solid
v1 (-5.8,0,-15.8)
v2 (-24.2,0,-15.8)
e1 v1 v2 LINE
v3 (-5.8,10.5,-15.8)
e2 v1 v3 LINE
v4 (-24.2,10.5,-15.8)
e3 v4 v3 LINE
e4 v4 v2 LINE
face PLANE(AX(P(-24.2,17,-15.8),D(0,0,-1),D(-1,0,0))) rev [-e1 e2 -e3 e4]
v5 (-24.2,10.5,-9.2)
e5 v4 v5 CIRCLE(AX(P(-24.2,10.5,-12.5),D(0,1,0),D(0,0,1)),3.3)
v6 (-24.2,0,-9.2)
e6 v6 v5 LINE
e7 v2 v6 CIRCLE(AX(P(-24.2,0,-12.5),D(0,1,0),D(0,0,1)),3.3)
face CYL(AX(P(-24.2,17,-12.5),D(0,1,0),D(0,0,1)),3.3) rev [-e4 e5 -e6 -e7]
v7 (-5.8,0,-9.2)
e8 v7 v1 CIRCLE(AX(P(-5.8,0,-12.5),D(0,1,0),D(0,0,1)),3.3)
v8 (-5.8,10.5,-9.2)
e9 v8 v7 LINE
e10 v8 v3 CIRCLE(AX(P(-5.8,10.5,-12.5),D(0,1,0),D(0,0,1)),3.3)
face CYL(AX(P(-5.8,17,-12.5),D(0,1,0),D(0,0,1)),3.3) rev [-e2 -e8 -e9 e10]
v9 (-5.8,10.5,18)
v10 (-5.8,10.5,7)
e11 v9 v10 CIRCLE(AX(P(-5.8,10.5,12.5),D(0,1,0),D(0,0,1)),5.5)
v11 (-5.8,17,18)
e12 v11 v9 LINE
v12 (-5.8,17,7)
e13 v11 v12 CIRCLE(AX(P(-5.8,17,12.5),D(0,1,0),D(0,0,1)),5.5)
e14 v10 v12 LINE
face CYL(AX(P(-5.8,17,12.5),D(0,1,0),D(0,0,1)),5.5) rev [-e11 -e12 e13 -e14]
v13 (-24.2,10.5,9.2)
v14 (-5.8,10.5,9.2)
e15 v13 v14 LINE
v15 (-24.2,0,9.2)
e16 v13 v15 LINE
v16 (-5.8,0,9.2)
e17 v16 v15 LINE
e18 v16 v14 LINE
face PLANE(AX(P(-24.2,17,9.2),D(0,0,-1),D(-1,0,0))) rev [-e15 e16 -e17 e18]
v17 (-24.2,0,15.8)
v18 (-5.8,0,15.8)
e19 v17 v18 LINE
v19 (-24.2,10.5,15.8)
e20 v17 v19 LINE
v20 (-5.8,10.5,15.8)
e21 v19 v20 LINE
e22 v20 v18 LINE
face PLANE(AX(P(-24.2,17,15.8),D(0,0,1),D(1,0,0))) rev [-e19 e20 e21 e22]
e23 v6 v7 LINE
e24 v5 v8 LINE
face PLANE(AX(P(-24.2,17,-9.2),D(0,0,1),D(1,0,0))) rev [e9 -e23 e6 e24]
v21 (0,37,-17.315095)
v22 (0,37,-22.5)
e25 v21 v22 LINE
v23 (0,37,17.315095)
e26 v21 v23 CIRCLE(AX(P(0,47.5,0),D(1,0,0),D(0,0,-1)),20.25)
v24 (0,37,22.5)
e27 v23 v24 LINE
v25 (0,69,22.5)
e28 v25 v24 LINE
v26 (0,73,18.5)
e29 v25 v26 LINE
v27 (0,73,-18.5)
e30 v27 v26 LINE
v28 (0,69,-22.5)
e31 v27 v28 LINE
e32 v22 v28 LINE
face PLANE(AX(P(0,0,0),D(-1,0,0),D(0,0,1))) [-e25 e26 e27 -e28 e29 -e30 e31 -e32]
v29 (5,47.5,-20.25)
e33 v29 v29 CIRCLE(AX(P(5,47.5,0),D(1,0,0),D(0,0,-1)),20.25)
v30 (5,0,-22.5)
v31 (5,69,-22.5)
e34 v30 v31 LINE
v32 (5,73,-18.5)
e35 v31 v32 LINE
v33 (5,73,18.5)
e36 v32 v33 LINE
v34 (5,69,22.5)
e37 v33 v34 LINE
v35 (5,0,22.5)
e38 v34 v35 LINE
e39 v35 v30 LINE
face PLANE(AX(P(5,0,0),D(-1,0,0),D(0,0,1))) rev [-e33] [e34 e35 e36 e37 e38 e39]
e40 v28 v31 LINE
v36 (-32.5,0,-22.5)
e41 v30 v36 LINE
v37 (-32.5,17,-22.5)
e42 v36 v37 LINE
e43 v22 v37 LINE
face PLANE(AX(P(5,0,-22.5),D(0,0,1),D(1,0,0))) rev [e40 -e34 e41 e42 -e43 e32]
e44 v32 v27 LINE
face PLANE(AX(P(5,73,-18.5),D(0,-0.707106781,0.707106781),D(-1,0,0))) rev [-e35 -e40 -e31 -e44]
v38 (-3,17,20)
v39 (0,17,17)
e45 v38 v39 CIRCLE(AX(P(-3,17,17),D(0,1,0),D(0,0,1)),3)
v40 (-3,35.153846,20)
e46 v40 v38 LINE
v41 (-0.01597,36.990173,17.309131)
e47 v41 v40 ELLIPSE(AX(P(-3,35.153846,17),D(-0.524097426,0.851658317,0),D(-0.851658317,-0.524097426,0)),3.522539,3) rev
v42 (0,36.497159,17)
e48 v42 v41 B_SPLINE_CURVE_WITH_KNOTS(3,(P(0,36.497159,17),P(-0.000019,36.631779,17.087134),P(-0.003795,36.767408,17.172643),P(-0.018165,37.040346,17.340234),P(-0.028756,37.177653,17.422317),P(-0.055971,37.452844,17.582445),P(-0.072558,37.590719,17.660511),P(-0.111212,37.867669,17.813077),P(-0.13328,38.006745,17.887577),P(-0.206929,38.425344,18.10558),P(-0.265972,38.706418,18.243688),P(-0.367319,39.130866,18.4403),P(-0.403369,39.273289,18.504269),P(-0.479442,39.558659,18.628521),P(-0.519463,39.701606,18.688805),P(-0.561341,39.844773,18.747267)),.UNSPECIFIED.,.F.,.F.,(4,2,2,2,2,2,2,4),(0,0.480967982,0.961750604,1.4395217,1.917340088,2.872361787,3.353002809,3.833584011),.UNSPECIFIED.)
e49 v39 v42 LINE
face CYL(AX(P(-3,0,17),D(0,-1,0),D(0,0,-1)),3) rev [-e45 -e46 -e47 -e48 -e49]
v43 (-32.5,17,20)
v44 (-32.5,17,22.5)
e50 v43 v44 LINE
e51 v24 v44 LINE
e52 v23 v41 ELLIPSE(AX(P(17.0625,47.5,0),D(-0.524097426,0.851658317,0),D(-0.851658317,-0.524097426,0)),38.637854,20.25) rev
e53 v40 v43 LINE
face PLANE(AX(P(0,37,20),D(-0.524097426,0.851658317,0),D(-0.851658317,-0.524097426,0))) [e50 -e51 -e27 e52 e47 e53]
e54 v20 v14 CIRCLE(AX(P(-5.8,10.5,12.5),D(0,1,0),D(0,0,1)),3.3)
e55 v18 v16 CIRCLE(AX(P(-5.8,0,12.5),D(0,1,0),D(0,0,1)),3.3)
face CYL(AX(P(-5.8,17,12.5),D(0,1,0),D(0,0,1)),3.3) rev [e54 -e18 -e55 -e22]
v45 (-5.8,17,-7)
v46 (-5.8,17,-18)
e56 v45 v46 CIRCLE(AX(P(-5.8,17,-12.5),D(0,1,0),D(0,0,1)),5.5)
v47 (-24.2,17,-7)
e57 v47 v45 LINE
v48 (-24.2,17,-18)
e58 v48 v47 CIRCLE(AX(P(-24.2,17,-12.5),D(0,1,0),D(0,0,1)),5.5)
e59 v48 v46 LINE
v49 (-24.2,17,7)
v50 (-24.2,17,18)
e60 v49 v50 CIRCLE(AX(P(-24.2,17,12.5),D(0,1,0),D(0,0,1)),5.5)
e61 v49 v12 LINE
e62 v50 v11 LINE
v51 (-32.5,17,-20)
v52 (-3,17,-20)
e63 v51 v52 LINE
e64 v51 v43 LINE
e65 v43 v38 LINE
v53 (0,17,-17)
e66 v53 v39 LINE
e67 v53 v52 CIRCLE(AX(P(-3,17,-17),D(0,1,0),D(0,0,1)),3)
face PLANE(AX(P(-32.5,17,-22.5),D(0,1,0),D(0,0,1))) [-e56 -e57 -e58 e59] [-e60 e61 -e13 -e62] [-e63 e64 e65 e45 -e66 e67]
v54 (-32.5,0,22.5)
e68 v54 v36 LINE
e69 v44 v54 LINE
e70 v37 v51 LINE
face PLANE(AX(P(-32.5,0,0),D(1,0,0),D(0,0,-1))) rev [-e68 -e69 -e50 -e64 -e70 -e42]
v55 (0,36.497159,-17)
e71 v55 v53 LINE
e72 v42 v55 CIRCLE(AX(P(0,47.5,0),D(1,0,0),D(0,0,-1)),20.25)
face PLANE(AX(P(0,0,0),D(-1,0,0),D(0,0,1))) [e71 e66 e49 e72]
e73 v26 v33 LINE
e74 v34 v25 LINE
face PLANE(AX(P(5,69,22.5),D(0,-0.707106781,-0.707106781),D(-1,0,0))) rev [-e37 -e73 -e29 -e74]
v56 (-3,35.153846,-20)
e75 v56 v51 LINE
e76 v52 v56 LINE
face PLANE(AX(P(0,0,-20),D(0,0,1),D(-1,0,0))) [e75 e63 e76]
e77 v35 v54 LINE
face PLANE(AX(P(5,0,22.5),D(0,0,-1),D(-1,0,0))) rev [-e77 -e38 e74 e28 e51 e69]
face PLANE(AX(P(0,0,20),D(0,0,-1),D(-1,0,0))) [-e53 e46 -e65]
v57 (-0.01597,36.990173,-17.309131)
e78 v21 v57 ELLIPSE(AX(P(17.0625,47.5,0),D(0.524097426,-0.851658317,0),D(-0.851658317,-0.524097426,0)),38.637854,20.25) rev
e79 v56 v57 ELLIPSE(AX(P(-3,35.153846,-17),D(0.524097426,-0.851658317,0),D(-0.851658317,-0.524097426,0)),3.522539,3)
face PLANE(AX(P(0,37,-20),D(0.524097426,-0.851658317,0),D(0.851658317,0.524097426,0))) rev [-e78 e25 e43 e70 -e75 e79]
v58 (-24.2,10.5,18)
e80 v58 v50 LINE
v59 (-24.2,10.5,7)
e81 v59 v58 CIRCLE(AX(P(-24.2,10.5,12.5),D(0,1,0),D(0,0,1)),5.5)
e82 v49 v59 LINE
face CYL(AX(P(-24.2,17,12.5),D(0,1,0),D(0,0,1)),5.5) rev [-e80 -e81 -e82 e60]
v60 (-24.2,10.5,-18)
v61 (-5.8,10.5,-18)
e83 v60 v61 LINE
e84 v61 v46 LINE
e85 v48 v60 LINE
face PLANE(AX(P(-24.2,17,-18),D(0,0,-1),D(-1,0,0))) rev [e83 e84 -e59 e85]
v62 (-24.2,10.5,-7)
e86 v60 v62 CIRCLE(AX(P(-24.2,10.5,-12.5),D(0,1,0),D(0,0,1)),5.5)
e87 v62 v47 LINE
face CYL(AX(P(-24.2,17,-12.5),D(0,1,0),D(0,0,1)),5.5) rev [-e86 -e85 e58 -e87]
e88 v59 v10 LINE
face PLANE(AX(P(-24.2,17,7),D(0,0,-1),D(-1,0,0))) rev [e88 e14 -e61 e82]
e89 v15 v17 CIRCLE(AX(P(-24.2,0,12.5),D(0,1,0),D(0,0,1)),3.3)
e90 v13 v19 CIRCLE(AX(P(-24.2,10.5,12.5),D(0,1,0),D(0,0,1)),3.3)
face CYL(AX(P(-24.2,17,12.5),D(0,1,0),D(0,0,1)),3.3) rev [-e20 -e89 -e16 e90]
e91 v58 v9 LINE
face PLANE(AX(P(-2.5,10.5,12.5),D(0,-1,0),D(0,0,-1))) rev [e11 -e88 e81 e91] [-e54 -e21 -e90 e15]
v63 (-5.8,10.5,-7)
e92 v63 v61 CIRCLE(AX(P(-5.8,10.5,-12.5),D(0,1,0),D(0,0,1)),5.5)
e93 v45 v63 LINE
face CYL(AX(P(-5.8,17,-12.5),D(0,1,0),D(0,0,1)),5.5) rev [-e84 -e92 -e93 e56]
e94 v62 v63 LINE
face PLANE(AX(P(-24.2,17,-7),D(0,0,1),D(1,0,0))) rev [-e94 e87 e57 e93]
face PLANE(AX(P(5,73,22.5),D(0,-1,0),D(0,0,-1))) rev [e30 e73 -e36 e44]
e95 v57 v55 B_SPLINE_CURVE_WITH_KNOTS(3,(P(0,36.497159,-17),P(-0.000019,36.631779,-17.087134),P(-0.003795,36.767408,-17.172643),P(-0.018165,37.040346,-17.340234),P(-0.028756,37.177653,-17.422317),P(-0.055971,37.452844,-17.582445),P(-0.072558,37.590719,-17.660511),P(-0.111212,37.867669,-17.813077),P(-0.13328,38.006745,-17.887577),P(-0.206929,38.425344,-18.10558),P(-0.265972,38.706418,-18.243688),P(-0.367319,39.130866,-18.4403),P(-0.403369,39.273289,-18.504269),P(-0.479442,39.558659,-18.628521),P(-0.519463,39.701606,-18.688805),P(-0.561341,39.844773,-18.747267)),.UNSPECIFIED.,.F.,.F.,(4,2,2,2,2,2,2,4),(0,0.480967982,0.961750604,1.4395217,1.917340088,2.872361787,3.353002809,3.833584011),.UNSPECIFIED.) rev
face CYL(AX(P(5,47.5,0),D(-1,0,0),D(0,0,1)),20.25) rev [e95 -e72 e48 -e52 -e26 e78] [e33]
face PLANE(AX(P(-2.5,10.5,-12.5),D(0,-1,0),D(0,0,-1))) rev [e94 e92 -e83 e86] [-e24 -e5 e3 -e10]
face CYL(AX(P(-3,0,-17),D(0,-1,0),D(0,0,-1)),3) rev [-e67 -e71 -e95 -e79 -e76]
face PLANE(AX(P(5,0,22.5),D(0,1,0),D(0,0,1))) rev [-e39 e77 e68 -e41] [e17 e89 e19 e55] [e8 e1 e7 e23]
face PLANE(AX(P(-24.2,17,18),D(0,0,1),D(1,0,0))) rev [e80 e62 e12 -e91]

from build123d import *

# Parameters (mm, degrees)
SKETCH1_W                                      = 45
SKETCH1_H                                      = 73
SKETCH1_R                                      = 20.25
BOSS_EXTRUDE1_DEPTH                            = 5
CHAMFER1_SIZE                                  = 4
SKETCH2_W                                      = 45
SKETCH2_H                                      = 17
BOSS_EXTRUDE2_DEPTH                            = 32.5
CBORE_SLOT_FOR_M6_HEX_SOCKET_HEAD_CAP_SC_DEPTH = 17
CBORE_START                                    = 10.5
CBORE_SLOT_FOR_M6_HEX_SOCKET_HEAD_CA_3_DEPTH   = 6.5
BOSS_EXTRUDE3_DEPTH                            = 2.5
FILLET1_R                                      = 3
FILLET1_OF_MIRROR1_R                           = 3


# Read off the part's stored shape, not the designer's step: CBORE SLOT for M6 Hex Socket Head Cap Screw1
with BuildPart() as part:
    # Sketch1 → Boss-Extrude1 (new body)
    with BuildSketch(Plane(origin=(0, 0, 0), x_dir=(0, 0, -1), z_dir=(1, 0, 0))):
        with Locations((0, 36.5)):
            Rectangle(SKETCH1_W, SKETCH1_H)
        with Locations((0, 47.5)):
            Circle(SKETCH1_R, mode=Mode.SUBTRACT)
    extrude(amount=BOSS_EXTRUDE1_DEPTH)

    # Chamfer1
    chamfer1_edges = [part.edges().sort_by_distance(p)[0] for p in [
        (2.5, 73, 22.5),
        (2.5, 73, -22.5),
    ]]
    chamfer(chamfer1_edges, length=CHAMFER1_SIZE)

    # Sketch2 → Boss-Extrude2 (add)
    with BuildSketch(Plane.ZY):
        with Locations((0, 8.5)):
            Rectangle(SKETCH2_W, SKETCH2_H)
    extrude(amount=BOSS_EXTRUDE2_DEPTH)

    # CBORE SLOT for M6 Hex Socket Head Ca 2 → CBORE SLOT for M6 Hex Socket Head Cap Screw1 (cut)
    with BuildSketch(Plane(origin=(0, 0, 0), x_dir=(1, 0, 0), z_dir=(0, 1, 0))):
        with BuildLine():
            Line((-24.2, -15.8), (-5.8, -15.8))
            ThreePointArc((-5.8, -15.8), (-2.5, -12.5), (-5.8, -9.2))
            Line((-5.8, -9.2), (-24.2, -9.2))
            ThreePointArc((-24.2, -9.2), (-27.5, -12.5), (-24.2, -15.8))
        make_face()
        with BuildLine():
            Line((-24.2, 9.2), (-5.8, 9.2))
            ThreePointArc((-5.8, 9.2), (-2.5, 12.5), (-5.8, 15.8))
            Line((-5.8, 15.8), (-24.2, 15.8))
            ThreePointArc((-24.2, 15.8), (-27.5, 12.5), (-24.2, 9.2))
        make_face()
    extrude(amount=CBORE_SLOT_FOR_M6_HEX_SOCKET_HEAD_CAP_SC_DEPTH, mode=Mode.SUBTRACT)

    # CBORE SLOT for M6 Hex Socket Head Ca 3 o → CBORE SLOT for M6 Hex Socket Head Ca 3 (cut)
    # profile 1 of 2: a face of its own
    with BuildSketch(Plane(origin=(0, 0, 0), x_dir=(1, 0, 0), z_dir=(0, 1, 0)).offset(CBORE_START)):
        with BuildLine():
            Line((-24.2, -18), (-5.8, -18))
            ThreePointArc((-5.8, -18), (-0.3, -12.5), (-5.8, -7))
            Line((-5.8, -7), (-24.2, -7))
            ThreePointArc((-24.2, -7), (-29.7, -12.5), (-24.2, -18))
        make_face()
        with BuildLine():
            ThreePointArc((-5.8, -9.2), (-2.5, -12.5), (-5.8, -15.8))
            Line((-5.8, -15.8), (-24.2, -15.8))
            ThreePointArc((-24.2, -15.8), (-27.5, -12.5), (-24.2, -9.2))
            Line((-24.2, -9.2), (-5.8, -9.2))
        make_face(mode=Mode.SUBTRACT)
    # profile 2 of 2: a face of its own
    with BuildSketch(Plane(origin=(0, 0, 0), x_dir=(1, 0, 0), z_dir=(0, 1, 0)).offset(CBORE_START)):
        with BuildLine():
            Line((-24.2, 7), (-5.8, 7))
            ThreePointArc((-5.8, 7), (-0.3, 12.5), (-5.8, 18))
            Line((-5.8, 18), (-24.2, 18))
            ThreePointArc((-24.2, 18), (-29.7, 12.5), (-24.2, 7))
        make_face()
        with BuildLine():
            ThreePointArc((-5.8, 15.8), (-2.5, 12.5), (-5.8, 9.2))
            Line((-5.8, 9.2), (-24.2, 9.2))
            ThreePointArc((-24.2, 9.2), (-27.5, 12.5), (-24.2, 15.8))
            Line((-24.2, 15.8), (-5.8, 15.8))
        make_face(mode=Mode.SUBTRACT)
    extrude(amount=CBORE_SLOT_FOR_M6_HEX_SOCKET_HEAD_CA_3_DEPTH, mode=Mode.SUBTRACT)

    # Sketch5 → Boss-Extrude3 (add)
    with BuildSketch(Plane.XY.offset(22.5)):
        Polygon((0, 37), (-32.5, 17), (0, 17), align=None)
    boss_extrude3 = extrude(amount=-BOSS_EXTRUDE3_DEPTH)

    # Fillet1
    # the kernel refuses this fillet: 3 mm, written as the material it adds along each edge
    with BuildSketch(Plane(origin=(0, 9.5, 20), x_dir=(0, 0, -1), z_dir=(0, 1, 0))) as fillet1_piece_1_section:
        with BuildLine():
            CenterArc((FILLET1_R, FILLET1_R), FILLET1_R, 180, 90)
            Line((0, FILLET1_R), (0, 0))
            Line((0, 0), (FILLET1_R, 0))
        make_face()
    fillet1_piece_1 = extrude(amount=35, mode=Mode.PRIVATE)
    fillet1_piece_1 = split(fillet1_piece_1, bisect_by=Plane(origin=(-11.093486365, 30.17323916, 19.320814657), z_dir=(0.5240974256643348, -0.8516583167045438, 0)), keep=Keep.TOP, mode=Mode.PRIVATE)
    fillet1_piece_1 = fillet1_piece_1 - Plane(origin=(-0.679185343, 47.5, 0), x_dir=(0, 0, -1), z_dir=(-1, 0, 0)) * Cylinder(20.25, 83, mode=Mode.PRIVATE)
    add(fillet1_piece_1)

    # Mirror1: Boss-Extrude3 across plane
    add(boss_extrude3.mirror(Plane.XY))

    # Fillet1 of Mirror1
    # the kernel refuses this fillet: 3 mm, written as the material it adds along each edge
    with BuildSketch(Plane(origin=(0, 9.5, -20), x_dir=(0, 0, 1), z_dir=(0, 1, 0))) as fillet1_of_mirror1_piece_1_section:
        with BuildLine():
            CenterArc((FILLET1_OF_MIRROR1_R, -FILLET1_OF_MIRROR1_R), FILLET1_OF_MIRROR1_R, 90, 90)
            Line((0, -FILLET1_OF_MIRROR1_R), (0, 0))
            Line((0, 0), (FILLET1_OF_MIRROR1_R, 0))
        make_face()
    fillet1_of_mirror1_piece_1 = extrude(amount=35, mode=Mode.PRIVATE)
    fillet1_of_mirror1_piece_1 = fillet1_of_mirror1_piece_1 - Plane(origin=(-0.679185343, 47.5, 0), x_dir=(0, 0, -1), z_dir=(-1, 0, 0)) * Cylinder(20.25, 83, mode=Mode.PRIVATE)
    fillet1_of_mirror1_piece_1 = split(fillet1_of_mirror1_piece_1, bisect_by=Plane(origin=(-11.093486365, 30.17323916, -19.320814657), z_dir=(0.5240974256643348, -0.8516583167045438, 0)), keep=Keep.TOP, mode=Mode.PRIVATE)
    add(fillet1_of_mirror1_piece_1)


solid = part.part
